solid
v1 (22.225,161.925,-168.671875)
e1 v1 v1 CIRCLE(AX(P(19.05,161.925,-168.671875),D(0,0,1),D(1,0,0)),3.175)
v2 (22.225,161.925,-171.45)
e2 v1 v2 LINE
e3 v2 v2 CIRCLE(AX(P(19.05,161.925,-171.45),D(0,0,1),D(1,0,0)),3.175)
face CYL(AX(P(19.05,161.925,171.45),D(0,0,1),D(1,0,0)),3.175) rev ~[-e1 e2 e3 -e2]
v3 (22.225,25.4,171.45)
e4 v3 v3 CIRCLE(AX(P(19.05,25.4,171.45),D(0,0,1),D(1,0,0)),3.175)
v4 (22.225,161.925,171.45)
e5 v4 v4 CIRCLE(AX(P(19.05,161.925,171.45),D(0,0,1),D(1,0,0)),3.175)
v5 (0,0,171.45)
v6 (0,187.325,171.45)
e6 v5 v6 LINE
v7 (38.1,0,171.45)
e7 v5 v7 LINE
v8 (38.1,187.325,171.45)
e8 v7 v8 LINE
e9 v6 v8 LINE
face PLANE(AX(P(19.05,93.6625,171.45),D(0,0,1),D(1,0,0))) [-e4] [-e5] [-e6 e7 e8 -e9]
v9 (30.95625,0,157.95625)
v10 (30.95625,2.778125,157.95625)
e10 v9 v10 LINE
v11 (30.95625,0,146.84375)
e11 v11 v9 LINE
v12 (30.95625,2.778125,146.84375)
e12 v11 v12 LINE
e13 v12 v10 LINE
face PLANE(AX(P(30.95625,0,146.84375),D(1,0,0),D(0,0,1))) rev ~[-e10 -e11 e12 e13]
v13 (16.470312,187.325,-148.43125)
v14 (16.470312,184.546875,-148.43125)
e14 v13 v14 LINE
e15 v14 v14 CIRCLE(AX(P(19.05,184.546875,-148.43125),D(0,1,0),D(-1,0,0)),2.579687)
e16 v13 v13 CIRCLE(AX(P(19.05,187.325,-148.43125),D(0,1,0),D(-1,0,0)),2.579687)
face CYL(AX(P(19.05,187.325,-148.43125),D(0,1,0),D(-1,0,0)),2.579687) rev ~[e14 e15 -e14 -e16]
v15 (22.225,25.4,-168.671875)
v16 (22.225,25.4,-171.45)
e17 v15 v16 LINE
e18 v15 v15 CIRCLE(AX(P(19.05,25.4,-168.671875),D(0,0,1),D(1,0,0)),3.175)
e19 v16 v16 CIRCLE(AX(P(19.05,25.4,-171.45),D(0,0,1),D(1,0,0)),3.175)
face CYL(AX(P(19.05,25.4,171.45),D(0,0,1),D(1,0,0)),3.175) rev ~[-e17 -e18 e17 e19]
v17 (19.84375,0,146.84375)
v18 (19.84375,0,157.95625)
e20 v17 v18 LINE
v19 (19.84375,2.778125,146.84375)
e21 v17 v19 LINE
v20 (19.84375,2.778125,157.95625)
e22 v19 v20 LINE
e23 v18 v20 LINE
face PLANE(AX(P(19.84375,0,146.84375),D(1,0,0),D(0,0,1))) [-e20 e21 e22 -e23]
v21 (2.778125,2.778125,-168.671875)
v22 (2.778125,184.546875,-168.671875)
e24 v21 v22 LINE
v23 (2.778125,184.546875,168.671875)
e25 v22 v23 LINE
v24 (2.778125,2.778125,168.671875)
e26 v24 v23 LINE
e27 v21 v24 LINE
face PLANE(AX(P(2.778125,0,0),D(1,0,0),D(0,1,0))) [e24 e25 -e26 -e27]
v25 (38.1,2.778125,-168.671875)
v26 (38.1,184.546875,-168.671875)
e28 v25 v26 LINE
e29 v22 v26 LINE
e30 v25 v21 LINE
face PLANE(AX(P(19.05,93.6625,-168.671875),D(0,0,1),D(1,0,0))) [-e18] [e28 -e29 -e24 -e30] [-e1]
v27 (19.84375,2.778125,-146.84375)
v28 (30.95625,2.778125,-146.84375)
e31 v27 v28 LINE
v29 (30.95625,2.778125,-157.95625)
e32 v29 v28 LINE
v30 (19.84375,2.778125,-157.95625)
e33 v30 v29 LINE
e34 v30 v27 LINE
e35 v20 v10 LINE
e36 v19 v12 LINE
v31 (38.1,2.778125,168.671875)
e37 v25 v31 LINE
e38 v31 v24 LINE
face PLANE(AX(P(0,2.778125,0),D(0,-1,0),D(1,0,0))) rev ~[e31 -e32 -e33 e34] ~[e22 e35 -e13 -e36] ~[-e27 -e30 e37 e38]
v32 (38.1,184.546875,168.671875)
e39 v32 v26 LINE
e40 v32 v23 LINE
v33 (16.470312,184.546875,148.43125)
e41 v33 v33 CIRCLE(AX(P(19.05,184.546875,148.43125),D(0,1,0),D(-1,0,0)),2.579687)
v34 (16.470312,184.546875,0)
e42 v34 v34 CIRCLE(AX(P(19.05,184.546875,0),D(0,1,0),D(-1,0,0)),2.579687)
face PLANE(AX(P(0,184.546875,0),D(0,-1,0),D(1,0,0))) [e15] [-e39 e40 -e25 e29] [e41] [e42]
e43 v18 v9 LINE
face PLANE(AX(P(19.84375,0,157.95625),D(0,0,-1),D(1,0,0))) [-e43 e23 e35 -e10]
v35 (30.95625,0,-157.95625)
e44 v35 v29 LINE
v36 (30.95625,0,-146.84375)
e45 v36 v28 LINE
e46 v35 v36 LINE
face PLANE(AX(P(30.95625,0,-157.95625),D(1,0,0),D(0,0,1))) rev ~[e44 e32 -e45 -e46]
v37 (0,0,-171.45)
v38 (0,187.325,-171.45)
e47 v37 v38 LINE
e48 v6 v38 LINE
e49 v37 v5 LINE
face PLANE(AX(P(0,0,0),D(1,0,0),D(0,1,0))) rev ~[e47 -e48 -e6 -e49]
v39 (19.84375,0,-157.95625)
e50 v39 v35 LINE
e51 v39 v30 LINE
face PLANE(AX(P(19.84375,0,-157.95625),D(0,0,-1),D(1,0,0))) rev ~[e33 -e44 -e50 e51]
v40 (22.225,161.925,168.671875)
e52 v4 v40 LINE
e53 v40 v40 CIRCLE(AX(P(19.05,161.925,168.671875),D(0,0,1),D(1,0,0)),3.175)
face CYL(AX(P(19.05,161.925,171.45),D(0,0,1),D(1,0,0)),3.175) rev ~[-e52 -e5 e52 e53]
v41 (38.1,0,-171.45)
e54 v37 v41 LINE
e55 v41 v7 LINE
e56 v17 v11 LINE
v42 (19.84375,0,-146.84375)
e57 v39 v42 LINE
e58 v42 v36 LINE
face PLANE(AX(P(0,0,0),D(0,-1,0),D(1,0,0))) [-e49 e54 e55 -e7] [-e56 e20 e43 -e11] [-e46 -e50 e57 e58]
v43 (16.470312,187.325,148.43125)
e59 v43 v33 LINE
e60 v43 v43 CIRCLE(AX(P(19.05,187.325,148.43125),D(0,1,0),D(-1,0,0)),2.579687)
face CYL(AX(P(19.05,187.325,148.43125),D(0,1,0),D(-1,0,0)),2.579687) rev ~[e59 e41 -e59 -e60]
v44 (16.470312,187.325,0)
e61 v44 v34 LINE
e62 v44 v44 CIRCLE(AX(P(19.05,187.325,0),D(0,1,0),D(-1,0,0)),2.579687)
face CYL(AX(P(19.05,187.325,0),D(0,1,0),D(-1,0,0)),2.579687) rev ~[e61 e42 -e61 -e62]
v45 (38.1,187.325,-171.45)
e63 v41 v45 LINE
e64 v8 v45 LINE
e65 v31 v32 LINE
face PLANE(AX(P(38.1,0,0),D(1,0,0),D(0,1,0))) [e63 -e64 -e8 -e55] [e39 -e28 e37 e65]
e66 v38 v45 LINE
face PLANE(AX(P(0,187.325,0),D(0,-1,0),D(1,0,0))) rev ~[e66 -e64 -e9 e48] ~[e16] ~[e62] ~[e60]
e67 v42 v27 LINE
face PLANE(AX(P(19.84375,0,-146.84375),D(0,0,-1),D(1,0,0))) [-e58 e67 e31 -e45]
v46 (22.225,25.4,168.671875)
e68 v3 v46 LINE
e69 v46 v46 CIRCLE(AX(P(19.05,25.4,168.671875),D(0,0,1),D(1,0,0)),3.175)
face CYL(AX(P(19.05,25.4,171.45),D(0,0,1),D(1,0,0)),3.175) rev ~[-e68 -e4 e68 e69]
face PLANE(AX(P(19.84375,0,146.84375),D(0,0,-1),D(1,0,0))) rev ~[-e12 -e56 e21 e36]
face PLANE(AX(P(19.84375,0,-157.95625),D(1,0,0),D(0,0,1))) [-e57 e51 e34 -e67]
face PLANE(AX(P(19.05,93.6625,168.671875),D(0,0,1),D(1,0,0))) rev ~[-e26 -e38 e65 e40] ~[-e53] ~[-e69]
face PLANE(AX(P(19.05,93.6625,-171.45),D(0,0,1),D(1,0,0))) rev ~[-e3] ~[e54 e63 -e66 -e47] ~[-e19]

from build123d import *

# Parameters (mm, degrees)
F0_W     = 38.1
F0_H     = 187.325
F1_DEPTH = 171.45
F2_T     = -2.778125
F3_R     = 2.5796875
F4_DEPTH = 2.778125
F5_R     = 3.175
F6_DEPTH = 342.901
F7_W     = 11.1125
F7_H     = 11.1125
F8_DEPTH = 2.778125


# Not quite as in the source:
# - a feature names something its author has since deleted; it is built from what else it names


with BuildPart() as f1:
    # F0 (on Top) → F1 (new body, symmetric)
    with BuildSketch(Plane.XY):
        with Locations((19.05, 93.6625)):
            Rectangle(F0_W, F0_H)
    extrude(amount=F1_DEPTH, both=True)

    # F2
    f2_openings = [f1.faces().sort_by_distance(p)[0] for p in [
        (38.1, 93.6625, 0),
    ]]
    offset(amount=F2_T, openings=f2_openings)

    # F3 (on face) → F4 (cut, through all)
    with BuildSketch(Plane(origin=(0, 187.325, 0), x_dir=(-1, 0, 0), z_dir=(0, 1, 0))):
        with Locations((-19.05, 148.43125)):
            Circle(F3_R)
        with Locations((-19.05, 0)):
            Circle(F3_R)
        with Locations((-19.05, -148.43125)):
            Circle(F3_R)
    extrude(amount=-F4_DEPTH, mode=Mode.SUBTRACT)

    # F5 (on face) → F6 (cut, through all)
    with BuildSketch(Plane.XY.offset(171.45)):
        with Locations((19.05, 161.925)):
            Circle(F5_R)
        with Locations((19.05, 25.4)):
            Circle(F5_R)
    extrude(amount=-F6_DEPTH, mode=Mode.SUBTRACT)

    # F7 (on face) → F8 (cut, through all)
    with BuildSketch(Plane.XZ):
        with Locations((25.4, 152.4)):
            Rectangle(F7_W, F7_H)
        with Locations((25.4, -152.4)):
            Rectangle(F7_W, F7_H)
    extrude(amount=-F8_DEPTH, mode=Mode.SUBTRACT)


solid = f1.part
